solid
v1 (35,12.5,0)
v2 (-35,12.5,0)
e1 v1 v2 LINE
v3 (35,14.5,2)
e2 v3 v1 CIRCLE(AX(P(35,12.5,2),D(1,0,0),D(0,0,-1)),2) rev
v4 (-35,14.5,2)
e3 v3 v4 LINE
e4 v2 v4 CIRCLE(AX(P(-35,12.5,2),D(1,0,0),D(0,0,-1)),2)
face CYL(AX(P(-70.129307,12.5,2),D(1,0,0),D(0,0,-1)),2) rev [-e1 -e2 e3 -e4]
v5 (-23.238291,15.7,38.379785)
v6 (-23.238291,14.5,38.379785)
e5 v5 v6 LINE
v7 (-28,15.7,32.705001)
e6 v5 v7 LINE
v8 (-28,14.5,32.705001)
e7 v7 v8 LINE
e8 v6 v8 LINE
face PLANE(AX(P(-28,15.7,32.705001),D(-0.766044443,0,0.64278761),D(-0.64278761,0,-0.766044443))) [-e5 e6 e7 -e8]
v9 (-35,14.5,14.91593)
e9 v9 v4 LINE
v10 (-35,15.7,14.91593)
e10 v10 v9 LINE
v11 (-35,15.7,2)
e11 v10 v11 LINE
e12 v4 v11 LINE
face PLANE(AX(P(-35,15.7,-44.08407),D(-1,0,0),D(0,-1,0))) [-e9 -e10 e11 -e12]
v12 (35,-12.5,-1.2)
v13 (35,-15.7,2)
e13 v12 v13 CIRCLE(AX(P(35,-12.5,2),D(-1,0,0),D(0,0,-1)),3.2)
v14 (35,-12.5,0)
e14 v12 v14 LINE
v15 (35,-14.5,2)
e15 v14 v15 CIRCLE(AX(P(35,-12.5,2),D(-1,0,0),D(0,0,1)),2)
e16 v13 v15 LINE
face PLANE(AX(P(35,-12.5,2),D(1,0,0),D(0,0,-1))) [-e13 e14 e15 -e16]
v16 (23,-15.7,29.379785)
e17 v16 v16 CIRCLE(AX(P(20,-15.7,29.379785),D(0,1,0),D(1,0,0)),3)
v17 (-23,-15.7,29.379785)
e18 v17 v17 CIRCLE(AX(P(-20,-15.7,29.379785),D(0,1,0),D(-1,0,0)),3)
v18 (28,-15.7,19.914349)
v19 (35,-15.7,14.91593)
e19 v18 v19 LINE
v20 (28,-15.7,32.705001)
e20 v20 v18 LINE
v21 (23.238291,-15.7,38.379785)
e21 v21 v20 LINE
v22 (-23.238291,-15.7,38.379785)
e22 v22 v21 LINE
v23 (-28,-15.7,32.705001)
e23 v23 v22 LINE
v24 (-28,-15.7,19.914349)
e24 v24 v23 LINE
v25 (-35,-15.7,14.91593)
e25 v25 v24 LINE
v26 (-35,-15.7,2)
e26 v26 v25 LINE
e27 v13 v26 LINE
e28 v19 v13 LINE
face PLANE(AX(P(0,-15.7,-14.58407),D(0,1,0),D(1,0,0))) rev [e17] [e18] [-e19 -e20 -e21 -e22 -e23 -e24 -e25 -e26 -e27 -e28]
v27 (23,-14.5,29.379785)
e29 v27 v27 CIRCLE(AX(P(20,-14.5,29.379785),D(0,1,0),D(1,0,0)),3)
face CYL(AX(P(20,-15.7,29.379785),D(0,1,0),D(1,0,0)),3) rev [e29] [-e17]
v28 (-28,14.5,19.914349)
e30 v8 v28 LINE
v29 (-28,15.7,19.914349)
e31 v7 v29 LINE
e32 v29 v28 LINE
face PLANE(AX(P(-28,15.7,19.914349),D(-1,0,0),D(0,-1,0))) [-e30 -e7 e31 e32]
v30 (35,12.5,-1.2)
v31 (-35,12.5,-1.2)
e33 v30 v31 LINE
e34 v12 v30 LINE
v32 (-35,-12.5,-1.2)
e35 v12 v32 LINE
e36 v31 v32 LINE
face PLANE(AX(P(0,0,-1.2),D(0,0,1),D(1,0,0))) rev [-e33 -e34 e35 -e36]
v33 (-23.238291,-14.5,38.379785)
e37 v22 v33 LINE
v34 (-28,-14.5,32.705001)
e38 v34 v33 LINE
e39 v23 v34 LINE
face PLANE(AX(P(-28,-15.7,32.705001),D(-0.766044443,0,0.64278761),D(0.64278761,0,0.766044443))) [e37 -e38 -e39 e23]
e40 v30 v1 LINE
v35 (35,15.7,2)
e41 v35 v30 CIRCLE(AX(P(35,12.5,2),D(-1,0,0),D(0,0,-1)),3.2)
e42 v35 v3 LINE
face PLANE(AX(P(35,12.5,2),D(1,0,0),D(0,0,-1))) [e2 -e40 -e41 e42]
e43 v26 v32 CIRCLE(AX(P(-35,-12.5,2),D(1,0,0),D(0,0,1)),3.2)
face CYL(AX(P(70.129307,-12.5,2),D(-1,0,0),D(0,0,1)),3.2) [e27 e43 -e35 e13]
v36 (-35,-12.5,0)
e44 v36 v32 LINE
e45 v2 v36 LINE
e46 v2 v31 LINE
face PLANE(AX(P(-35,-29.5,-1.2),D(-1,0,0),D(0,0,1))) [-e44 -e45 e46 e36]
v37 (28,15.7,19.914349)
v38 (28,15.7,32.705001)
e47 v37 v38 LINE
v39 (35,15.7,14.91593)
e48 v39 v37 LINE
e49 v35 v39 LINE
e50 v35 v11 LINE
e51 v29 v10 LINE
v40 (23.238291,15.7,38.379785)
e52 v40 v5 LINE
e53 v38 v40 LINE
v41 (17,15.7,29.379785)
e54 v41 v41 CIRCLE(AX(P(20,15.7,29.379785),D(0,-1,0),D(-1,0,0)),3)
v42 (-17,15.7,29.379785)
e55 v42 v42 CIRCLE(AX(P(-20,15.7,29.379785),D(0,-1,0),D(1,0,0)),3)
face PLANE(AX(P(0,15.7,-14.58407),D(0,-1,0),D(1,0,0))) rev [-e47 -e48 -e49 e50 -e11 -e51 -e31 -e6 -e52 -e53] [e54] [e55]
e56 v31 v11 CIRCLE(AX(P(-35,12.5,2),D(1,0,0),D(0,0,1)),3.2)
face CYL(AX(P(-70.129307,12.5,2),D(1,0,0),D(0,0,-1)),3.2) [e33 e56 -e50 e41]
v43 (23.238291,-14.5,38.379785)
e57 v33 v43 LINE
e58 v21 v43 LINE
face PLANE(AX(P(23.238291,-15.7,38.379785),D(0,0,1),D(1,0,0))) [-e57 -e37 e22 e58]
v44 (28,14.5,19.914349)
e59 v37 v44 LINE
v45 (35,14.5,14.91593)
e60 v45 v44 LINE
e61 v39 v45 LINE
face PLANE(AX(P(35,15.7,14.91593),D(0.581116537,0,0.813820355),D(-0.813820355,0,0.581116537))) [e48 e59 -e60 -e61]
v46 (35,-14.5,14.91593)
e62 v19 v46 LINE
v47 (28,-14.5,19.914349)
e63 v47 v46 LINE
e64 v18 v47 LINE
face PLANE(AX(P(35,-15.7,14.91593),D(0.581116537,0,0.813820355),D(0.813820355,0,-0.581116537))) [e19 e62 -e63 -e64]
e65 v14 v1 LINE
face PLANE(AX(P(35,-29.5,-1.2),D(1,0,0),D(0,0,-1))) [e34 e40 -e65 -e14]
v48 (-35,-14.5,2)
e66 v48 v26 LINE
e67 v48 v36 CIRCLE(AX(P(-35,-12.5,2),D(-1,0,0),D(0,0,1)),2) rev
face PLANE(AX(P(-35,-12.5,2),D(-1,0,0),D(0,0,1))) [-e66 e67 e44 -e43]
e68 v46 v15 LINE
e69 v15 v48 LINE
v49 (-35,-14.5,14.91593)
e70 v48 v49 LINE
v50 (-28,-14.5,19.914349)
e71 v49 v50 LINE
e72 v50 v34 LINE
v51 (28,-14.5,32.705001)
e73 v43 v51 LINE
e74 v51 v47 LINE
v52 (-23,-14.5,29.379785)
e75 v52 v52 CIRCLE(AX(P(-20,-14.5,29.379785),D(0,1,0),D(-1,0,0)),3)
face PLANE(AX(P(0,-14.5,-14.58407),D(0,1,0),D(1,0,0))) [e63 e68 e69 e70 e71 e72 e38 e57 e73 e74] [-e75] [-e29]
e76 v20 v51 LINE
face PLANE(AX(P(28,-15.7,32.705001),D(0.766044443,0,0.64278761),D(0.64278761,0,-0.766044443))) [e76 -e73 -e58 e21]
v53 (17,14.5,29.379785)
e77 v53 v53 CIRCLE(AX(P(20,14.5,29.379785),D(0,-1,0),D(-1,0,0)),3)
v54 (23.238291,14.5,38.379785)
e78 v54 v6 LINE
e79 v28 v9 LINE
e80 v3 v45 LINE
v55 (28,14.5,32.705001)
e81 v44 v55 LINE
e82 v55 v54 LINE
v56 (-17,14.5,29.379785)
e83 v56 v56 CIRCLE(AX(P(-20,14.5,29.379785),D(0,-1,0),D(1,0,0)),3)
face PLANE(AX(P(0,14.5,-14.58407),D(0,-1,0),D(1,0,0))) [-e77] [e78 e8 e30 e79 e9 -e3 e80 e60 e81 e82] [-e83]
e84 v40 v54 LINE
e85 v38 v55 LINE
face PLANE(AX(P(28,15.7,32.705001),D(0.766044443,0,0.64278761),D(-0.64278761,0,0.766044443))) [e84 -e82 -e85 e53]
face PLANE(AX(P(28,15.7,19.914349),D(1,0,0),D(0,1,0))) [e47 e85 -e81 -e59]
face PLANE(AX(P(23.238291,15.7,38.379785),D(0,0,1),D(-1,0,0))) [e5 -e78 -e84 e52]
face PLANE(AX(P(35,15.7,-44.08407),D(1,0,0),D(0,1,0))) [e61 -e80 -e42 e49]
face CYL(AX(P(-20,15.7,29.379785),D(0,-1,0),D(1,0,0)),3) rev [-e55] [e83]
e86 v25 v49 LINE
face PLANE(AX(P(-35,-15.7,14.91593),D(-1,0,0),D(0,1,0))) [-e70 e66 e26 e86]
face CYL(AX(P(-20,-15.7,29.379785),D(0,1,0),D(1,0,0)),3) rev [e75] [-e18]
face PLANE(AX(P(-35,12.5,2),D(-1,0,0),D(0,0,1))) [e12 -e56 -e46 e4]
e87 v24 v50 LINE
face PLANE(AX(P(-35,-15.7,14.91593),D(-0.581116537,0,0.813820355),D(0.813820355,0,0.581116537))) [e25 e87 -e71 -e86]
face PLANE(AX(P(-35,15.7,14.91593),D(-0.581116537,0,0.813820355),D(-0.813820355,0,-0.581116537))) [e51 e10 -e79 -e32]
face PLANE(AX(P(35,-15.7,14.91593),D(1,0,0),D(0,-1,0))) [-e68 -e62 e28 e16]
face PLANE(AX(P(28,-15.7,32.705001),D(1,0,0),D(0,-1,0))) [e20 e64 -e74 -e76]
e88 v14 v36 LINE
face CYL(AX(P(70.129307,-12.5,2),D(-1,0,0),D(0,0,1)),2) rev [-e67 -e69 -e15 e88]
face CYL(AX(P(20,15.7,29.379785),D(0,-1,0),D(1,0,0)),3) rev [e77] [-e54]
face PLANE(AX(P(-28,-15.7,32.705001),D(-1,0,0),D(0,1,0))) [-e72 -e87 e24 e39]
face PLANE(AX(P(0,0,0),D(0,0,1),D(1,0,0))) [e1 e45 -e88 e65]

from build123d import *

# Parameters (mm, degrees)
SM_BASE_FLANGE_1_DEPTH = 1.2
SKETCH_5_R             = 3
CUT_EXTRUDE_1_DEPTH    = 64.494960298
OTHER_START            = 15.362016
OTHER_1_OUTLINE_W      = 70
OTHER_1_OUTLINE_H      = 1.2
OTHER_1_DEPTH          = 37.601839442
OTHER_START_2          = -52.963855442
OTHER_1_2_OUTLINE_W    = 70
OTHER_1_2_OUTLINE_H    = 1.2
OTHER_1_2_DEPTH        = 37.565871442
OTHER_START_3          = -15.7
OTHER_1_3_OUTLINE_R    = 3
OTHER_1_3_DEPTH        = 3.2
OTHER_START_4          = 12.5
OTHER_1_4_OUTLINE_R    = 3
OTHER_1_4_DEPTH        = 3.2
OTHER_START_5          = -35
OTHER_1_5_DEPTH        = 70


with BuildPart() as part:
    # 基体-法兰1: sheet metal written as solids
    # Sketch 1 → 基体-法兰1 (new body)
    with BuildSketch(Plane.XY):
        Polygon((35, 29.5), (28, 34.498419782), (28, 47.289071522), (23.238290906, 52.963855442), (-23.238290906, 52.963855442), (-28, 47.289071522), (-28, 34.498419782), (-35, 29.5), (-35, -29.5), (-28, -34.498419782), (-28, -47.289071522), (-23.238290906, -52.963855442), (23.238290906, -52.963855442), (28, -47.289071522), (28, -34.498419782), (35, -29.5), align=None)
    extrude(amount=-SM_BASE_FLANGE_1_DEPTH)

    # 草图5 → 切除-拉伸1 (cut, through all)
    with BuildSketch(Plane.XY):
        with Locations((-20, 43.963855442)):
            Circle(SKETCH_5_R)
        with Locations(Location((20, 43.963855442, 0), (0, 0, 180))):
            Circle(SKETCH_5_R)
        with Locations((20, -43.963855442)):
            Circle(SKETCH_5_R)
        with Locations(Location((-20, -43.963855442, 0), (0, 0, 180))):
            Circle(SKETCH_5_R)
    extrude(amount=-CUT_EXTRUDE_1_DEPTH, mode=Mode.SUBTRACT)

    # Other 1: read off the stored shape, not the designer's step
    # Other 1 outline → Other 1 (cut)
    with BuildSketch(Plane(origin=(0, 0, 0), x_dir=(1, 0, 0), z_dir=(0, 1, 0)).offset(OTHER_START)):
        with Locations((0, 0.6)):
            Rectangle(OTHER_1_OUTLINE_W, OTHER_1_OUTLINE_H)
    extrude(amount=OTHER_1_DEPTH, mode=Mode.SUBTRACT)

    # Other 1 2 outline → Other 1 2 (cut)
    with BuildSketch(Plane(origin=(0, 0, 0), x_dir=(1, 0, 0), z_dir=(0, 1, 0)).offset(OTHER_START_2)):
        with Locations((0, 0.6)):
            Rectangle(OTHER_1_2_OUTLINE_W, OTHER_1_2_OUTLINE_H)
    extrude(amount=OTHER_1_2_DEPTH, mode=Mode.SUBTRACT)

    # Other 1 3 outline → Other 1 3 (add)
    with BuildSketch(Plane(origin=(0, 0, 0), x_dir=(1, 0, 0), z_dir=(0, 1, 0)).offset(OTHER_START_3)):
        Polygon((35, 0), (-35, 0), (-35, -14.91592955), (-28, -19.914349333), (-28, -32.705001072), (-23.238290906, -38.379784993), (23.238290906, -38.379784993), (28, -32.705001072), (28, -19.914349333), (35, -14.91592955), align=None)
        with Locations((-20, -29.379784993)):
            Circle(OTHER_1_3_OUTLINE_R, mode=Mode.SUBTRACT)
        with Locations((20, -29.379784993)):
            Circle(OTHER_1_3_OUTLINE_R, mode=Mode.SUBTRACT)
    extrude(amount=OTHER_1_3_DEPTH)

    # Other 1 4 outline → Other 1 4 (add)
    with BuildSketch(Plane(origin=(0, 0, 0), x_dir=(1, 0, 0), z_dir=(0, 1, 0)).offset(OTHER_START_4)):
        Polygon((35, 0), (-35, 0), (-35, -14.91592955), (-28, -19.914349333), (-28, -32.705001072), (-23.238290906, -38.379784993), (23.238290906, -38.379784993), (28, -32.705001072), (28, -19.914349333), (35, -14.91592955), align=None)
        with Locations((-20, -29.379784993)):
            Circle(OTHER_1_4_OUTLINE_R, mode=Mode.SUBTRACT)
        with Locations((20, -29.379784993)):
            Circle(OTHER_1_4_OUTLINE_R, mode=Mode.SUBTRACT)
    extrude(amount=OTHER_1_4_DEPTH)

    # Other 1 5 outline → Other 1 5 (cut)
    with BuildSketch(Plane.YZ.offset(OTHER_START_5)):
        with BuildLine():
            Line((14.5, 2), (14.5, 38.379784993))
            Line((14.5, 38.379784993), (12.5, 38.379784993))
            Line((12.5, 38.379784993), (12.5, 0))
            ThreePointArc((12.5, 0), (13.914213562, 0.585786438), (14.5, 2))
        make_face()
        with BuildLine():
            Line((-12.5, 38.379784993), (-14.5, 38.379784993))
            Line((-14.5, 38.379784993), (-14.5, 2))
            ThreePointArc((-14.5, 2), (-13.914213562, 0.585786438), (-12.5, 0))
            Line((-12.5, 0), (-12.5, 38.379784993))
        make_face()
        with BuildLine():
            Line((-15.397984, -1.2), (-12.5, -1.2))
            ThreePointArc((-12.5, -1.2), (-14.7627417, -0.2627417), (-15.7, 2))
            Line((-15.7, 2), (-15.7, 0))
            Line((-15.7, 0), (-15.397984, 0))
            Line((-15.397984, 0), (-15.397984, -1.2))
        make_face()
        with BuildLine():
            ThreePointArc((15.7, 2), (14.7627417, -0.2627417), (12.5, -1.2))
            Line((12.5, -1.2), (15.362016, -1.2))
            Line((15.362016, -1.2), (15.362016, 0))
            Line((15.362016, 0), (15.7, 0))
            Line((15.7, 0), (15.7, 2))
        make_face()
    extrude(amount=OTHER_1_5_DEPTH, mode=Mode.SUBTRACT)


solid = part.part
